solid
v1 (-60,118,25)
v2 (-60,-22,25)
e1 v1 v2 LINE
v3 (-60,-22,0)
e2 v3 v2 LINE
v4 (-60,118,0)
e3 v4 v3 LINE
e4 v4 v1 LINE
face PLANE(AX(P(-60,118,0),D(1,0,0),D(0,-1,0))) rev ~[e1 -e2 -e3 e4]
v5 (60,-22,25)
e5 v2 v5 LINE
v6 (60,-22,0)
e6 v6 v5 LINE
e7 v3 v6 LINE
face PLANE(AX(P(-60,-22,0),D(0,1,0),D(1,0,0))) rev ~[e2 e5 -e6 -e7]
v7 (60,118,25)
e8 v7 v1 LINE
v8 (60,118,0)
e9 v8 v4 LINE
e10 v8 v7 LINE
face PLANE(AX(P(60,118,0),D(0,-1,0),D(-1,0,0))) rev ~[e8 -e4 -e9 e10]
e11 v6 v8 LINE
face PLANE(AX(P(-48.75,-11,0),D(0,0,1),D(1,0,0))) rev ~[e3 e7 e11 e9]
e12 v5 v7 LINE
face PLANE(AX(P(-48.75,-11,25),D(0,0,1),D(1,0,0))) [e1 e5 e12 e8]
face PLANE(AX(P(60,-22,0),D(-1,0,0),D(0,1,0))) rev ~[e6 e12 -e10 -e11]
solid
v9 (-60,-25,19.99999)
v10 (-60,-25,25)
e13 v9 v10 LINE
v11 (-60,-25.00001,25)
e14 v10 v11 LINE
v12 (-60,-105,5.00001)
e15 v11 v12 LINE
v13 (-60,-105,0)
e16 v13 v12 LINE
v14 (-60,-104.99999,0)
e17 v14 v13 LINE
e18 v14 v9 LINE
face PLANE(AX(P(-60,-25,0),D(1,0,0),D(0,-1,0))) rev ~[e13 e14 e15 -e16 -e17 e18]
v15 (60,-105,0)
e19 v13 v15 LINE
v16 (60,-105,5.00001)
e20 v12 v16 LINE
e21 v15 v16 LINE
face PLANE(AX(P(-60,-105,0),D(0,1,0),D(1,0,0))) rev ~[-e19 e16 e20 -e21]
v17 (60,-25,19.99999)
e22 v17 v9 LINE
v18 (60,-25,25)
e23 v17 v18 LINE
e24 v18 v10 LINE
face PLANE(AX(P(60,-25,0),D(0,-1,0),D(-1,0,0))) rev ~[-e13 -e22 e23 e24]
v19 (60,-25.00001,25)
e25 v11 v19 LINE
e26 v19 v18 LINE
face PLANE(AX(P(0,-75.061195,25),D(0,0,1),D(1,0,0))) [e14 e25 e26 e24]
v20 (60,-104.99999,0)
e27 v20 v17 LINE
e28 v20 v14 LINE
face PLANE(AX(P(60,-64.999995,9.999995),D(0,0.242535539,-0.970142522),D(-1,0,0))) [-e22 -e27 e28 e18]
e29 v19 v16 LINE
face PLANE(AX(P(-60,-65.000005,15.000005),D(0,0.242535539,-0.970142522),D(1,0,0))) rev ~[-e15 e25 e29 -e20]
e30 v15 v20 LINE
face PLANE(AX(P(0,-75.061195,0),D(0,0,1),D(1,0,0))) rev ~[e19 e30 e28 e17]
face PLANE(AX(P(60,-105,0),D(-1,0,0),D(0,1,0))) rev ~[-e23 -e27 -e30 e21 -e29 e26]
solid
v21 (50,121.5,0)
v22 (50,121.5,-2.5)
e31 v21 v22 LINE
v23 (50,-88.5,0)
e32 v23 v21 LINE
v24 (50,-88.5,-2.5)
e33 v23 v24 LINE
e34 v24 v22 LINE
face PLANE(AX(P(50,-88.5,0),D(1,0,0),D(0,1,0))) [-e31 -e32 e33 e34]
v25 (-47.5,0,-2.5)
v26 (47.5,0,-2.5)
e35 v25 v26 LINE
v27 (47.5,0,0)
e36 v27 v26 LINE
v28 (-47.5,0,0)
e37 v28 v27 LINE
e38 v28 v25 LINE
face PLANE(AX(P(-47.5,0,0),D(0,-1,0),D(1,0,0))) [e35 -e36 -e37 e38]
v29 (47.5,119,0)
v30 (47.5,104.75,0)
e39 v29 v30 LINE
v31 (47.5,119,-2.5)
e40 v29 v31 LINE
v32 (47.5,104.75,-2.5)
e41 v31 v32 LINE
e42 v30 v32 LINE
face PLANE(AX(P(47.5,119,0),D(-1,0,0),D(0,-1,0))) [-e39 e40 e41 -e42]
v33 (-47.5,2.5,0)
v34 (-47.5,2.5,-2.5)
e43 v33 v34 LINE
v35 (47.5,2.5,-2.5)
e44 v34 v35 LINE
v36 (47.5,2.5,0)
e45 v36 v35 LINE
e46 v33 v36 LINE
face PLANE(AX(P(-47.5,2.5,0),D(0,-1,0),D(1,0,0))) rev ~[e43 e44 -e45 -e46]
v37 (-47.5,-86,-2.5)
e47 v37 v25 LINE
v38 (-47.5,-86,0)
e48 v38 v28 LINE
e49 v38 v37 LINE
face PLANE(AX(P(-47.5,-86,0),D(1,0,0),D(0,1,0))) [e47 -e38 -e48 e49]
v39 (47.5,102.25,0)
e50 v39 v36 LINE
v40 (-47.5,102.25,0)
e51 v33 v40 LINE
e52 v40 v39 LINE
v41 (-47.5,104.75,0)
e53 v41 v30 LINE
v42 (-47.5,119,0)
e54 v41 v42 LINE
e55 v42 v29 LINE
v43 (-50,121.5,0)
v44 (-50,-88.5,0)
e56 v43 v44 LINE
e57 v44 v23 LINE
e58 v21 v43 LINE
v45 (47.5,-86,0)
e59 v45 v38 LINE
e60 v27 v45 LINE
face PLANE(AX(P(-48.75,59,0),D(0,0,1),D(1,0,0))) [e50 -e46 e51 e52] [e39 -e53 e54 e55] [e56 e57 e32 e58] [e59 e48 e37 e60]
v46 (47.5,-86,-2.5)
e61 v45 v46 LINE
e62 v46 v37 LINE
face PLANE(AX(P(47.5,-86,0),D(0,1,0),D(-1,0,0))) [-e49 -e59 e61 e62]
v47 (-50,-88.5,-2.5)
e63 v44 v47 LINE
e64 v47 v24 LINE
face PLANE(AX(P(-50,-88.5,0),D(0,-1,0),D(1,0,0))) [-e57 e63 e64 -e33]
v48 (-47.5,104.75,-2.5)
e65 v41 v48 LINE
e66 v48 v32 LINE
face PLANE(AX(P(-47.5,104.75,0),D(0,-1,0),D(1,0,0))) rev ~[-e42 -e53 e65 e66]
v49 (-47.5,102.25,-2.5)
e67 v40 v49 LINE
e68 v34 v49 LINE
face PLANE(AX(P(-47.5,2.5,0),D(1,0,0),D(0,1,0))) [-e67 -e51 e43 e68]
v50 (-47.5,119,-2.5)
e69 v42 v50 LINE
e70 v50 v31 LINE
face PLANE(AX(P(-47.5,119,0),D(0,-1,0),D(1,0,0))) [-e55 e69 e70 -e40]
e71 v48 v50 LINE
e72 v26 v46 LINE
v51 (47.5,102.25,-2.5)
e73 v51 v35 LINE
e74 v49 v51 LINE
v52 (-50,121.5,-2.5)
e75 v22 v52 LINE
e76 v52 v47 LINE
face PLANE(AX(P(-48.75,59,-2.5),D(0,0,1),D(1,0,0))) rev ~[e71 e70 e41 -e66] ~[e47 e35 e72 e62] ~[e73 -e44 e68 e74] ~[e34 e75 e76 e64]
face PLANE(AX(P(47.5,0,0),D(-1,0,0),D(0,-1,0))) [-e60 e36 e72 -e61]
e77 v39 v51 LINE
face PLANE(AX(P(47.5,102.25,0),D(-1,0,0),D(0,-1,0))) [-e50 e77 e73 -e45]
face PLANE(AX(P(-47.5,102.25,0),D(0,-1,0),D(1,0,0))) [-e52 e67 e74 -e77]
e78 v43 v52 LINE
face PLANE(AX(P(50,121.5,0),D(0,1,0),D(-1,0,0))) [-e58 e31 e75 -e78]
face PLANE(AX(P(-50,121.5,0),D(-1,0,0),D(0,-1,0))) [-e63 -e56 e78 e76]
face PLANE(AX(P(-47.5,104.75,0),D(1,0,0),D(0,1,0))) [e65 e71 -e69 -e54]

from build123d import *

# Parameters (mm, degrees)
F0_W       = 95
F0_H       = 2.5
F0_W_2     = 2.5
F0_H_2     = 22
F0_H_3     = 3
F1_DEPTH   = 2.5
F0_H_4     = 99.75
F0_H_5     = 13.25
F2_DEPTH   = 25
F0_H_6     = 61
F3_DEPTH   = 25
F4_SIZE2   = 19.99999
F4_SIZE    = 79.99999
F4_2_SIZE2 = 19.99999
F4_2_SIZE  = 79.99999


# Not quite as in the source:
# - a fillet or chamfer is up to 0.001 mm smaller than in the source, because OpenCascade refuses the exact size


with BuildPart() as f1:
    # F0 (on Top) → F1 (new body)
    with BuildSketch(Plane.XY):
        Polygon((-47.5, 118), (-50, 118), (-50, 0), (-47.5, 0), (-47.5, 2.5), (-47.5, 102.25), (-47.5, 104.75), align=None)
        Polygon((50, 121.5), (-50, 121.5), (-50, 118), (-47.5, 118), (-47.5, 119), (47.5, 119), (47.5, 118), (50, 118), align=None)
        with Locations((0, 103.5)):
            Rectangle(F0_W, F0_H)
        Polygon((50, 0), (50, 118), (47.5, 118), (47.5, 104.75), (47.5, 102.25), (47.5, 2.5), (47.5, 0), align=None)
        with Locations((0, 1.25)):
            Rectangle(F0_W, F0_H)
        with Locations((-48.75, -11)):
            Rectangle(F0_W_2, F0_H_2)
        Polygon((-47.5, -25), (-50, -25), (-50, -88.5), (50, -88.5), (50, -25), (47.5, -25), (47.5, -86), (-47.5, -86), align=None)
        with Locations((48.75, -11)):
            Rectangle(F0_W_2, F0_H_2)
        with Locations((-48.75, -23.5)):
            Rectangle(F0_W_2, F0_H_3)
        with Locations((48.75, -23.5)):
            Rectangle(F0_W_2, F0_H_3)
    extrude(amount=-F1_DEPTH)


with BuildPart() as f2:
    # F0 (on Top) → F2 (new body)
    with BuildSketch(Plane.XY):
        with Locations((-48.75, -11)):
            Rectangle(F0_W_2, F0_H_2)
        with Locations((0, -11)):
            Rectangle(F0_W, F0_H_2)
        with Locations((48.75, -11)):
            Rectangle(F0_W_2, F0_H_2)
        Polygon((60, 118), (50, 118), (50, 0), (50, -22), (60, -22), align=None)
        with Locations((0, 1.25)):
            Rectangle(F0_W, F0_H)
        Polygon((50, 0), (50, 118), (47.5, 118), (47.5, 104.75), (47.5, 102.25), (47.5, 2.5), (47.5, 0), align=None)
        Polygon((-47.5, 118), (-50, 118), (-50, 0), (-47.5, 0), (-47.5, 2.5), (-47.5, 102.25), (-47.5, 104.75), align=None)
        with Locations((0, 103.5)):
            Rectangle(F0_W, F0_H)
        Polygon((-50, 0), (-50, 118), (-60, 118), (-60, -22), (-50, -22), align=None)
        with Locations((0, 52.375)):
            Rectangle(F0_W, F0_H_4)
        with Locations((0, 111.375)):
            Rectangle(F0_W, F0_H_5)
    extrude(amount=F2_DEPTH)


with BuildPart() as f3:
    # F0 (on Top) → F3 (new body)
    with BuildSketch(Plane.XY):
        Polygon((-50, -88.5), (-50, -25), (-60, -25), (-60, -105), (60, -105), (60, -25), (50, -25), (50, -88.5), align=None)
        Polygon((-47.5, -25), (-50, -25), (-50, -88.5), (50, -88.5), (50, -25), (47.5, -25), (47.5, -86), (-47.5, -86), align=None)
        with Locations((0, -55.5)):
            Rectangle(F0_W, F0_H_6)
    extrude(amount=F3_DEPTH)

    # F4 (size 80 and 20 in the source; OpenCascade refuses exactly that, so slightly less here)
    f4_edges = [f3.edges().sort_by_distance(p)[0] for p in [
        (0, -105, 25),
    ]]
    f4_side = f3.faces().sort_by_distance((0, -65, 25))[0]
    chamfer(f4_edges, length=F4_SIZE, length2=F4_SIZE2, reference=f4_side)

    # F4#2 (size 80 and 20 in the source; OpenCascade refuses exactly that, so slightly less here)
    f4_2_edges = [f3.edges().sort_by_distance(p)[0] for p in [
        (0, -25, 0),
    ]]
    f4_2_side = f3.faces().sort_by_distance((0, -65, 0))[0]
    chamfer(f4_2_edges, length=F4_2_SIZE, length2=F4_2_SIZE2, reference=f4_2_side)


solid = Compound([f1.part, f2.part, f3.part])
